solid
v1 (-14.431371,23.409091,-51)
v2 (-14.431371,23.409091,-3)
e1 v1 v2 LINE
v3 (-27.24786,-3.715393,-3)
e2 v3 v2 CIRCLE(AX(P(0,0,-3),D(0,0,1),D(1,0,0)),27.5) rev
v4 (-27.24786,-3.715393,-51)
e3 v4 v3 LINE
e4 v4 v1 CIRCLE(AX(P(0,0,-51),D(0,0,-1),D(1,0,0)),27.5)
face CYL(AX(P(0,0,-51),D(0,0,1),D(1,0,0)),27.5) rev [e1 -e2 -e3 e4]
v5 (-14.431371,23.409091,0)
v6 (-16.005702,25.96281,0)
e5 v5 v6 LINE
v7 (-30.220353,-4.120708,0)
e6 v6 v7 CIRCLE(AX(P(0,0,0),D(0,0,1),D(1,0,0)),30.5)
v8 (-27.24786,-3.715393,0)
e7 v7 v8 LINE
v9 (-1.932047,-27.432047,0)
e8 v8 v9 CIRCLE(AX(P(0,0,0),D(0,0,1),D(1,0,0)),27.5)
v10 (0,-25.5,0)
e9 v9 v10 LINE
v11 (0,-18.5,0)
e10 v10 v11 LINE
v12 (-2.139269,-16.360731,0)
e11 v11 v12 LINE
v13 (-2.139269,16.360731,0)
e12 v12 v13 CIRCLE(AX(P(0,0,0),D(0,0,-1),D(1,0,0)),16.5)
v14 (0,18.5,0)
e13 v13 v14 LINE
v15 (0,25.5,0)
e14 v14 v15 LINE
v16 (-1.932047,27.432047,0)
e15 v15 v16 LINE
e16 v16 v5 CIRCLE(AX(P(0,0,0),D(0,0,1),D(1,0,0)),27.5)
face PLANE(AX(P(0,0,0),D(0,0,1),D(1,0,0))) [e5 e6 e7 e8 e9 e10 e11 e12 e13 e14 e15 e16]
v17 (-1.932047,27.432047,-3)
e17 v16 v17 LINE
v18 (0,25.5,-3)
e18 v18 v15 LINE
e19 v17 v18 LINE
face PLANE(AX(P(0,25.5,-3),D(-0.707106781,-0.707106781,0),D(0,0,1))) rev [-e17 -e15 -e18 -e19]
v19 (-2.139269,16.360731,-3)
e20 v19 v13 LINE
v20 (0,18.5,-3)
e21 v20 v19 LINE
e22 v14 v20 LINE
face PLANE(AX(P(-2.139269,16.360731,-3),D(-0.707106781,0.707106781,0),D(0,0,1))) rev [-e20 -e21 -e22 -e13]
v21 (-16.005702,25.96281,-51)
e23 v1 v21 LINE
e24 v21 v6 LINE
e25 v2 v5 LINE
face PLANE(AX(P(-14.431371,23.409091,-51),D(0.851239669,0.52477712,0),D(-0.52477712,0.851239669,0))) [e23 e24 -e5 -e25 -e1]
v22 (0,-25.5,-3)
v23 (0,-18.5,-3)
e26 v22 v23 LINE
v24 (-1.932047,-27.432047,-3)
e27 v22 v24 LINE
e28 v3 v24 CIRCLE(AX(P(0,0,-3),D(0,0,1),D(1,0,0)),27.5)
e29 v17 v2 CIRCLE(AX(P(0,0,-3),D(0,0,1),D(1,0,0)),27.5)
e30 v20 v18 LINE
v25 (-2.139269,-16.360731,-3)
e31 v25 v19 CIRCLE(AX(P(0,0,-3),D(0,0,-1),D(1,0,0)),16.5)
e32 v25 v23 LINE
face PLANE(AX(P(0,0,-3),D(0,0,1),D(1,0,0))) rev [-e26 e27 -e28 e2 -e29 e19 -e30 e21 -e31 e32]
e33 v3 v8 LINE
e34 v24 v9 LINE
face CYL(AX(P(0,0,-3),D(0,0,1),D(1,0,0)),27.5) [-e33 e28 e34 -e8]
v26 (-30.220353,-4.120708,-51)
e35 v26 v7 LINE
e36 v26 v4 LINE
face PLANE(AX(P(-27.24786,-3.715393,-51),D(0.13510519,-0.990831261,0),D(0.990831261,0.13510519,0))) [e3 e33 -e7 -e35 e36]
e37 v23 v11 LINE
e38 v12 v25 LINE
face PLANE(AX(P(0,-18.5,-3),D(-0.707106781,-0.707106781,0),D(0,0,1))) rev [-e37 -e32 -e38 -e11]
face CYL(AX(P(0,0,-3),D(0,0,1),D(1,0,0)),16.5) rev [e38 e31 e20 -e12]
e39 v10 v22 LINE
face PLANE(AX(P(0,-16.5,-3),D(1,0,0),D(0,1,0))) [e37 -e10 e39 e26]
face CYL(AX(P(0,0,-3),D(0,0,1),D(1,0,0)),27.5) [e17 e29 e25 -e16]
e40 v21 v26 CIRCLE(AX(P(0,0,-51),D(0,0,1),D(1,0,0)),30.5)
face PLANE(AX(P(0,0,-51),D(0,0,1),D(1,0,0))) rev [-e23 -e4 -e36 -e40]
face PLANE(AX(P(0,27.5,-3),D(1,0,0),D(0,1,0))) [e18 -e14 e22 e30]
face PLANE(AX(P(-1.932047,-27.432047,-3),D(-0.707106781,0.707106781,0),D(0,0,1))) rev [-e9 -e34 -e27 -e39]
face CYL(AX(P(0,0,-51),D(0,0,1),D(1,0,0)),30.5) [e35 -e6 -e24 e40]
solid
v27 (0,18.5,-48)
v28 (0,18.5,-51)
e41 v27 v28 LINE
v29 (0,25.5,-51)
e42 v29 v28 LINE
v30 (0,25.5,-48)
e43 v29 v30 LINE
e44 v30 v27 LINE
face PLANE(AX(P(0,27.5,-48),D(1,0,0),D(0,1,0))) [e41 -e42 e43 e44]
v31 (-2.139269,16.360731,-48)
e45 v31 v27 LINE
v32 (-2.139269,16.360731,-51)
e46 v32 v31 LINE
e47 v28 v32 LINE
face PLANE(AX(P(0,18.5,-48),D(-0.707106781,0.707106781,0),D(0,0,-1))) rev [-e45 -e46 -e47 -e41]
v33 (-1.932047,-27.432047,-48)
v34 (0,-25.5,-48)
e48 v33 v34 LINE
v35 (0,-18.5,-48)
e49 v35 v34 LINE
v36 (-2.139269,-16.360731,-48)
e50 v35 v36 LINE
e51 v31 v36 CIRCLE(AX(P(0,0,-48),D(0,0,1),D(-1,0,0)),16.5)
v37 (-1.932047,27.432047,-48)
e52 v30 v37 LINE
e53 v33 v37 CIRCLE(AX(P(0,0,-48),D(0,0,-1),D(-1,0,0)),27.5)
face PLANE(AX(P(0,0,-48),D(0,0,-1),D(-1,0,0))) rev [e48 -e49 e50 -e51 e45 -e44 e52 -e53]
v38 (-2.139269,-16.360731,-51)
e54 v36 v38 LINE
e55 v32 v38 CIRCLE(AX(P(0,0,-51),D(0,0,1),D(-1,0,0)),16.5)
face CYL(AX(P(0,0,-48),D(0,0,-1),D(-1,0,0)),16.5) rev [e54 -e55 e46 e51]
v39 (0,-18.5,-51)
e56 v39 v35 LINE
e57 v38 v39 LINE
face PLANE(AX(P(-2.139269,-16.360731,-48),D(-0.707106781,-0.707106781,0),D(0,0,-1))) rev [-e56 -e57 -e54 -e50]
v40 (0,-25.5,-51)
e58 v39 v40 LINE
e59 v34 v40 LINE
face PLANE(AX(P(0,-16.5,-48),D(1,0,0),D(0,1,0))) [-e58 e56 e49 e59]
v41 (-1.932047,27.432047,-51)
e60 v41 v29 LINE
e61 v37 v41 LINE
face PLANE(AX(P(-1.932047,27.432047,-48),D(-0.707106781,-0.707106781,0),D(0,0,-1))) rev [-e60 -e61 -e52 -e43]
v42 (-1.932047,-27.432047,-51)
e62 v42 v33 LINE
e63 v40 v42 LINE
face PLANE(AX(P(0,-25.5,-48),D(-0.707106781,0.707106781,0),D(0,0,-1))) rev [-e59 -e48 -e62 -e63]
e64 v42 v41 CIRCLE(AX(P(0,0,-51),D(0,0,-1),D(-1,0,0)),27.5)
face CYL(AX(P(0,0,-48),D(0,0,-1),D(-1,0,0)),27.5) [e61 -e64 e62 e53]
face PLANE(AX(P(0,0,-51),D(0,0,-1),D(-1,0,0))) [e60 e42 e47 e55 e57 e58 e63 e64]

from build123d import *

# Parameters (mm, degrees)
BASE_FLANGE1_DEPTH  = 3
BOSS_EXTRUDE1_DEPTH = 51
BASE_FLANGE2_START  = -3
BASE_FLANGE2_DEPTH  = 3
CHAMFER1_SIZE       = 2
CHAMFER2_SIZE       = 2


# Sheet-metal steps are written as plain solids
with BuildPart() as part:
    # Base-Flange1: sheet metal written as solids
    # Sketch1 → Base-Flange1 (new body)
    with BuildSketch(Plane.XY):
        with BuildLine():
            Line((0, 27.5), (0, 16.5))
            ThreePointArc((0, 16.5), (-16.5, 0), (0, -16.5))
            Line((0, -16.5), (0, -27.5))
            ThreePointArc((0, -27.5), (-27.5, 0), (0, 27.5))
        make_face()
    extrude(amount=-BASE_FLANGE1_DEPTH)

    # Sketch6 → Boss-Extrude1 (add)
    with BuildSketch(Plane.XY):
        with BuildLine():
            Line((-14.431370788, 23.409090909), (-16.005702146, 25.962809917))
            ThreePointArc((-16.005702146, 25.962809917), (-27.576558365, 13.030097036), (-30.220353458, -4.120708299))
            Line((-30.220353458, -4.120708299), (-27.247859675, -3.715392728))
            ThreePointArc((-27.247859675, -3.715392728), (-24.864110001, 11.748448147), (-14.431370788, 23.409090909))
        make_face()
    extrude(amount=-BOSS_EXTRUDE1_DEPTH)

    # Chamfer1
    # the kernel refuses this chamfer: 2 mm, written as the material it takes off along each edge
    with BuildSketch(Plane(origin=(0, 27.5, 5.143365976), x_dir=(0, -1, 0), z_dir=(0, 0, -1))) as chamfer1_piece_1:
        with BuildLine():
            Line((CHAMFER1_SIZE, 0), (0.06795314, 1.93204686))
            ThreePointArc((0.06795314, 1.93204686), (0.017965239, 0.993863861), (0, 0))
            Line((0, 0), (CHAMFER1_SIZE, 0))
        make_face()
    extrude(amount=13.286731952, mode=Mode.SUBTRACT)
    with BuildSketch(Plane(origin=(0, 16.5, 5.511382139), x_dir=(-0.9978876375482535, -0.06496354999817457, 0), z_dir=(0, 0, -1))) as chamfer1_piece_2:
        with BuildLine():
            Line((2.14379715, 0), (-CHAMFER1_SIZE * 0.0649635499982, CHAMFER1_SIZE * 0.997887637548))
            Line((-CHAMFER1_SIZE * 0.0649635499982, CHAMFER1_SIZE * 0.997887637548), (0, 0))
            ThreePointArc((0, 0), (1.102072489, 0.034826391), (2.14379715, 0))
        make_face()
    extrude(amount=14.022764278, mode=Mode.SUBTRACT)
    with BuildSketch(Plane(origin=(0, -16.5, 5.511382139), x_dir=(0, -1, 0), z_dir=(0, 0, -1))) as chamfer1_piece_3:
        with BuildLine():
            Line((CHAMFER1_SIZE, 0), (-0.139268673, 2.139268673))
            ThreePointArc((-0.139268673, 2.139268673), (-0.036841717, 1.102006958), (0, 0))
            Line((0, 0), (CHAMFER1_SIZE, 0))
        make_face()
    extrude(amount=14.022764278, mode=Mode.SUBTRACT)
    with BuildSketch(Plane(origin=(0, -27.5, 5.143365976), x_dir=(0, 1, 0), z_dir=(0, 0, -1))) as chamfer1_piece_4:
        with BuildLine():
            Line((CHAMFER1_SIZE, 0), (0.06795314, -1.93204686))
            ThreePointArc((0.06795314, -1.93204686), (0.017965239, -0.993863861), (0, 0))
            Line((0, 0), (CHAMFER1_SIZE, 0))
        make_face()
    extrude(amount=13.286731952, mode=Mode.SUBTRACT)


with BuildPart() as body_2:
    # Base-Flange2: sheet metal written as solids
    # Sketch7 → Base-Flange2 (new body)
    with BuildSketch(Plane(origin=(0, 0, -51), x_dir=(-1, 0, 0), z_dir=(0, 0, -1)).offset(BASE_FLANGE2_START)):
        with BuildLine():
            Line((0, 27.5), (0, 16.5))
            ThreePointArc((0, 16.5), (16.5, 0), (0, -16.5))
            Line((0, -16.5), (0, -27.5))
            ThreePointArc((0, -27.5), (27.5, 0), (0, 27.5))
        make_face()
    extrude(amount=BASE_FLANGE2_DEPTH)

    # Chamfer2
    # the kernel refuses this chamfer: 2 mm, written as the material it takes off along each edge
    with BuildSketch(Plane(origin=(0, -27.5, -42.856634024), x_dir=(0, 1, 0), z_dir=(0, 0, -1))) as chamfer2_piece_1:
        with BuildLine():
            Line((CHAMFER2_SIZE, 0), (0.06795314, -1.93204686))
            ThreePointArc((0.06795314, -1.93204686), (0.017965239, -0.993863861), (0, 0))
            Line((0, 0), (CHAMFER2_SIZE, 0))
        make_face()
    extrude(amount=13.286731952, mode=Mode.SUBTRACT)
    with BuildSketch(Plane(origin=(0, -16.5, -42.488617861), x_dir=(-0.9978876375482537, 0.06496354999817457, 0), z_dir=(0, 0, -1))) as chamfer2_piece_2:
        with BuildLine():
            Line((2.14379715, 0), (-CHAMFER2_SIZE * 0.0649635499982, -CHAMFER2_SIZE * 0.997887637548))
            Line((-CHAMFER2_SIZE * 0.0649635499982, -CHAMFER2_SIZE * 0.997887637548), (0, 0))
            ThreePointArc((0, 0), (1.102072489, -0.034826391), (2.14379715, 0))
        make_face()
    extrude(amount=14.022764278, mode=Mode.SUBTRACT)
    with BuildSketch(Plane(origin=(0, 16.5, -42.488617861), x_dir=(0, 1, 0), z_dir=(0, 0, -1))) as chamfer2_piece_3:
        with BuildLine():
            Line((CHAMFER2_SIZE, 0), (-0.139268673, -2.139268673))
            ThreePointArc((-0.139268673, -2.139268673), (-0.036841717, -1.102006958), (0, 0))
            Line((0, 0), (CHAMFER2_SIZE, 0))
        make_face()
    extrude(amount=14.022764278, mode=Mode.SUBTRACT)
    with BuildSketch(Plane(origin=(0, 27.5, -42.856634024), x_dir=(0, -1, 0), z_dir=(0, 0, -1))) as chamfer2_piece_4:
        with BuildLine():
            Line((CHAMFER2_SIZE, 0), (0.06795314, 1.93204686))
            ThreePointArc((0.06795314, 1.93204686), (0.017965239, 0.993863861), (0, 0))
            Line((0, 0), (CHAMFER2_SIZE, 0))
        make_face()
    extrude(amount=13.286731952, mode=Mode.SUBTRACT)


solid = Compound([part.part, body_2.part])
